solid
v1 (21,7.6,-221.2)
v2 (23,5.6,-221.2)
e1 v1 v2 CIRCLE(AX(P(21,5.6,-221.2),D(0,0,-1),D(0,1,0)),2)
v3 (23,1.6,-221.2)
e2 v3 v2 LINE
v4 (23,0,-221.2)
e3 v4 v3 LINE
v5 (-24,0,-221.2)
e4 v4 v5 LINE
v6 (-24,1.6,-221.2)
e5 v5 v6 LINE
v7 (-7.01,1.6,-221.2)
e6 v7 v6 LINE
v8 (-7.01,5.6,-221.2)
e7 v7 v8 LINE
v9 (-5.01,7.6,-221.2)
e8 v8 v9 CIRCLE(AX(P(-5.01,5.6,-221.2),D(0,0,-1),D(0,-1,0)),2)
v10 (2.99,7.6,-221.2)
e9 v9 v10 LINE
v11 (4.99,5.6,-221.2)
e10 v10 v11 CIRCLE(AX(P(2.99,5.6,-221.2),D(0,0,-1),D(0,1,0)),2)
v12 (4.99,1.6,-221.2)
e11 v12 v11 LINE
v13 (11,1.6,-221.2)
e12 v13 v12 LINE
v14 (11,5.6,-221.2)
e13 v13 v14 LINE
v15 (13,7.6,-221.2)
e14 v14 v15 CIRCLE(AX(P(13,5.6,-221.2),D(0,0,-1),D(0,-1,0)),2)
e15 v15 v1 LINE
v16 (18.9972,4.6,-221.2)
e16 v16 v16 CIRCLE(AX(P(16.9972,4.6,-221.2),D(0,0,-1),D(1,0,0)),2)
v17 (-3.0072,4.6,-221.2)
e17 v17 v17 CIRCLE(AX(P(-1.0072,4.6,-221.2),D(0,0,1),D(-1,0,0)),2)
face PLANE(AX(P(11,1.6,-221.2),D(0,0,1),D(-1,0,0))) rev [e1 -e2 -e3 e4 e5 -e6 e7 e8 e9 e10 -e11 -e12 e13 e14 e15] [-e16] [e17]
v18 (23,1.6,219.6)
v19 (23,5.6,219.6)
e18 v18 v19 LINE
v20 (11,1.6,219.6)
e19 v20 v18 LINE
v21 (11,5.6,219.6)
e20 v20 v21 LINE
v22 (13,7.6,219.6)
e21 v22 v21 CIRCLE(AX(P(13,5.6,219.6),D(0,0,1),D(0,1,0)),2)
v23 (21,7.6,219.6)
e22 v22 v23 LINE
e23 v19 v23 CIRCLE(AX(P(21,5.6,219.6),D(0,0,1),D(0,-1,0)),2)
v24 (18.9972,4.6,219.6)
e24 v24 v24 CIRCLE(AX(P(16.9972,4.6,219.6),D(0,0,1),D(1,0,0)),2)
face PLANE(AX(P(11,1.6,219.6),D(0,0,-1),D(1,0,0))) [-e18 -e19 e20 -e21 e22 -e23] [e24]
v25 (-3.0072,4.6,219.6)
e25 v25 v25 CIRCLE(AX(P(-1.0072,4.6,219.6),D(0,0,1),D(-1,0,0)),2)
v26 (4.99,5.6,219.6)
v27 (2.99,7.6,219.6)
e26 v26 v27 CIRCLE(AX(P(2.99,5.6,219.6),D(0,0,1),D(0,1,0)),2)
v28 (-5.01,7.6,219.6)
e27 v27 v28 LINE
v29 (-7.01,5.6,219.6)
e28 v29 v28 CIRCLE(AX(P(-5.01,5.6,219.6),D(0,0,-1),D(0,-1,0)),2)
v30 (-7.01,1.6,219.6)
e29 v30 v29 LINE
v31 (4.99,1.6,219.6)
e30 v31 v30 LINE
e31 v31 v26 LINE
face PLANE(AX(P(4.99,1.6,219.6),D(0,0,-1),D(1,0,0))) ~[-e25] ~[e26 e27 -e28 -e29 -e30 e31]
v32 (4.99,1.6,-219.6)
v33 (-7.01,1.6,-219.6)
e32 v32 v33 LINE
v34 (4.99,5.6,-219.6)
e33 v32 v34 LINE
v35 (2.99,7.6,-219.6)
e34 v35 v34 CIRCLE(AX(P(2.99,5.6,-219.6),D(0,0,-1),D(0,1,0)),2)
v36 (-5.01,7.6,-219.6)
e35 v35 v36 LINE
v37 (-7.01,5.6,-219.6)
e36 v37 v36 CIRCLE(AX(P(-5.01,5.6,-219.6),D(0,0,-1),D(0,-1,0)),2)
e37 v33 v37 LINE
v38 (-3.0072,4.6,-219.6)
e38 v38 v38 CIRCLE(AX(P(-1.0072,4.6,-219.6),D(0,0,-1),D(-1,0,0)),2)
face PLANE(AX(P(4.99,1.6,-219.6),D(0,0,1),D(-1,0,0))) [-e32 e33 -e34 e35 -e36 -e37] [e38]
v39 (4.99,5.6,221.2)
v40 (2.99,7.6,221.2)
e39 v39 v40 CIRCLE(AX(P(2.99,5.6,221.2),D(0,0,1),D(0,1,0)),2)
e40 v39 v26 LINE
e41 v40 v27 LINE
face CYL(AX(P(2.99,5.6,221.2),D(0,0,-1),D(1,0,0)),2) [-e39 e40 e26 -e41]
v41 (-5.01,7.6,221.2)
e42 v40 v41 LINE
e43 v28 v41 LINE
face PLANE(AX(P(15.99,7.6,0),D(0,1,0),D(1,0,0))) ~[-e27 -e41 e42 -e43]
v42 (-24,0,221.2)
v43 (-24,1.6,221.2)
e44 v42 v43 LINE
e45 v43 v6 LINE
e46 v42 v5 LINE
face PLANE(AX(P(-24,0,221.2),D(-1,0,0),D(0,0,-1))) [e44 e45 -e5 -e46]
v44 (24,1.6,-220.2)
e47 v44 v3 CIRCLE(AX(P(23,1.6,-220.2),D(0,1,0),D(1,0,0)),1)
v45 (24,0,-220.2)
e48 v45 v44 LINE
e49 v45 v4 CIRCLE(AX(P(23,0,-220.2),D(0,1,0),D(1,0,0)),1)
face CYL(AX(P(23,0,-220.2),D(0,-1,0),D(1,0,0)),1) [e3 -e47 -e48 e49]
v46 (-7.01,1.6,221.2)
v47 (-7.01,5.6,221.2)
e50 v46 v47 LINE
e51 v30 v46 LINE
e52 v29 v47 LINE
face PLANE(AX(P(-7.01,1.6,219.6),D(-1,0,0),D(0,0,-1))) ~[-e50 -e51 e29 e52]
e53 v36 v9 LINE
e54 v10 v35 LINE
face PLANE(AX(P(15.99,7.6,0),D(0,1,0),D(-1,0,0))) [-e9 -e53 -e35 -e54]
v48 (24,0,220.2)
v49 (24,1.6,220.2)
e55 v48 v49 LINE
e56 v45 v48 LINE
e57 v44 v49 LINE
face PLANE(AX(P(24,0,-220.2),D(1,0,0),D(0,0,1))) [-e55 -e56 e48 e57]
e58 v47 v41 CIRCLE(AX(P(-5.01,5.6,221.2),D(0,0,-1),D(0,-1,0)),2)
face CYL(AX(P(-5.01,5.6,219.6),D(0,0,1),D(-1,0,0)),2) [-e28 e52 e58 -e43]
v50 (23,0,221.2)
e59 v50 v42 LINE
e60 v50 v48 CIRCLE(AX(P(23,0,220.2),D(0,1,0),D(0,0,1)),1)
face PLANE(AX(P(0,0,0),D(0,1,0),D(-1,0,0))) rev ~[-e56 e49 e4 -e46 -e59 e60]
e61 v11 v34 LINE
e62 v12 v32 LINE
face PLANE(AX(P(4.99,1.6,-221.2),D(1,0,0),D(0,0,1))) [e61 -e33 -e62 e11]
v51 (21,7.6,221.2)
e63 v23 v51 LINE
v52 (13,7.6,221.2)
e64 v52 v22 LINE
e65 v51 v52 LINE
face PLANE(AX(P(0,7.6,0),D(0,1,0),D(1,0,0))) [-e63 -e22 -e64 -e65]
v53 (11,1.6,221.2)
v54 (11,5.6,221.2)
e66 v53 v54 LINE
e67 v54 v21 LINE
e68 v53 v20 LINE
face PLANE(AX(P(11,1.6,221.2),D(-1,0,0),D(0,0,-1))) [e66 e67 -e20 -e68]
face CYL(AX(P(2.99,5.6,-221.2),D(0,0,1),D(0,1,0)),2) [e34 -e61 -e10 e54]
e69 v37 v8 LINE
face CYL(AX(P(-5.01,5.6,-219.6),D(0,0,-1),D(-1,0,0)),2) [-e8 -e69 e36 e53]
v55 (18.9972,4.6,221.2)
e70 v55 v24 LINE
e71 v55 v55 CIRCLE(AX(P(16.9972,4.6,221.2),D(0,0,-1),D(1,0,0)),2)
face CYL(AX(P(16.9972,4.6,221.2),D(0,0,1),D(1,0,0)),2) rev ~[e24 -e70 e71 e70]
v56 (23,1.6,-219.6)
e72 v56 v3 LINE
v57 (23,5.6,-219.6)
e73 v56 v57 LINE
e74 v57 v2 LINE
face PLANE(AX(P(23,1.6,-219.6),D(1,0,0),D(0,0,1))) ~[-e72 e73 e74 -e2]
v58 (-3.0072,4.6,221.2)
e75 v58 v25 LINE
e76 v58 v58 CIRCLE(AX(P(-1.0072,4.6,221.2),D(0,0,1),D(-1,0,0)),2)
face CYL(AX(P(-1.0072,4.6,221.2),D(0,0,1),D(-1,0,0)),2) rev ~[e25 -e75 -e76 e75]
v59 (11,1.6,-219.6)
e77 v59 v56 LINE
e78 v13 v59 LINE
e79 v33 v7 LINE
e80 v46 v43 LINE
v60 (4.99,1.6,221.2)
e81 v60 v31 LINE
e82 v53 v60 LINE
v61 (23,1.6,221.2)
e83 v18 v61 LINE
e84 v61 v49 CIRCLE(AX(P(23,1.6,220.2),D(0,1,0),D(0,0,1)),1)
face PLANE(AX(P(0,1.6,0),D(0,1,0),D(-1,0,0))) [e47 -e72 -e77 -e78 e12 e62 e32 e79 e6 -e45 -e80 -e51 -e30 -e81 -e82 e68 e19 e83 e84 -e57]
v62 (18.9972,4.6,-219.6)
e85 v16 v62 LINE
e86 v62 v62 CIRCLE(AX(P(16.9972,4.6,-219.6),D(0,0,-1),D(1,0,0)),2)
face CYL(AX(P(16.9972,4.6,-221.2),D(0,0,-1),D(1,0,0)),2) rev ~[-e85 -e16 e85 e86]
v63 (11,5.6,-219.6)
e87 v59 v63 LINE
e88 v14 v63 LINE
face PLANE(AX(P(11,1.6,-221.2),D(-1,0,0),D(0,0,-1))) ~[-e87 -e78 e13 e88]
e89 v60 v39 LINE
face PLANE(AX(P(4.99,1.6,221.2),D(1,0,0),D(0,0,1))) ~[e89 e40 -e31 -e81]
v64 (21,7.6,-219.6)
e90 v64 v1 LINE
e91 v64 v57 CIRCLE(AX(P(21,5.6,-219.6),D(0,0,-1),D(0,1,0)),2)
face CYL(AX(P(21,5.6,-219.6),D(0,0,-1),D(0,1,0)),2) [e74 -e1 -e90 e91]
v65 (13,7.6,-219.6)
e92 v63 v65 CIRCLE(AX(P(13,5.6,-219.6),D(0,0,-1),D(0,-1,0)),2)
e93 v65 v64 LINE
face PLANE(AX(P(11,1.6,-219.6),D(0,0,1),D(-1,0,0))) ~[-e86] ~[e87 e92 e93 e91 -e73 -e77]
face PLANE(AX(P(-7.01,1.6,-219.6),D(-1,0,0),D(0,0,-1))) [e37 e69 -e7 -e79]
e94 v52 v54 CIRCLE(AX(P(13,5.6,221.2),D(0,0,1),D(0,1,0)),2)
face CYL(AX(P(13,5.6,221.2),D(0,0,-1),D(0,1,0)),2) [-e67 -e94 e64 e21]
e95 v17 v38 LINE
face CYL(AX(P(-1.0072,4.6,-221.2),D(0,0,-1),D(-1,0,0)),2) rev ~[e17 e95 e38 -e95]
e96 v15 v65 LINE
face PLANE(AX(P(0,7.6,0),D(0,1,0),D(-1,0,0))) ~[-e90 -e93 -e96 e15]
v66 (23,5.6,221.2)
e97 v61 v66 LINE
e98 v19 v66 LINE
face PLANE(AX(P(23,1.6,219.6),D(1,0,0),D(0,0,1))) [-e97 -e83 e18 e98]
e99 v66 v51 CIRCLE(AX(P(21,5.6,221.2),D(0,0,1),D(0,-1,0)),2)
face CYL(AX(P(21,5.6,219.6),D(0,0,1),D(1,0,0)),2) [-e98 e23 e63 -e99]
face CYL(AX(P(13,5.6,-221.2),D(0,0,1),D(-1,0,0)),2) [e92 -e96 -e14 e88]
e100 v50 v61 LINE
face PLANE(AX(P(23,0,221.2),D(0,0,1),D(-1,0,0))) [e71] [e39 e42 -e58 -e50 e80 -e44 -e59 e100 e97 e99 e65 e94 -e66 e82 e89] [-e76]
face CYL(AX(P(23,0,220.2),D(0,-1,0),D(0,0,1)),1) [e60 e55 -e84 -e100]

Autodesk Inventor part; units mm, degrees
ref_plane "XZ Plane" through (0, 0, 0) normal (0, 1, 0) x (-1, 0, 0)
ref_plane "XY Plane" through (0, 0, 0) normal (0, 0, 1) x (1, 0, 0)
sketch "Sketch1" plane through (0, 0, 0) normal (0, 1, 0) x (-1, 0, 0)
  line L0 (24, 221.2) -> (24, -221.2)
  line L1 (-24, -220.2) -> (-24, 220.2)
  arc A0 (-23, 221.2) -> (-24, 220.2) centre (-23, 220.2) ccw
  arc A1 (-24, -220.2) -> (-23, -221.2) centre (-23, -220.2) ccw
  line L2 (0, 0) -> (-12.5, 0)
  line L3 (-23, 221.2) -> (24, 221.2)
  line L4 (-23, -221.2) -> (24, -221.2)
  point P0 (-24, -221.2)
  dimension "d0" = 442.4
  dimension "d1" = 48
  dimension "d2" = 1
  dimension "d3" = 1
  dimension "d58" = 221.2
extrude "Extrusion1" add sketch "Sketch1" along normal blind 1.6
ref_plane "Work Plane1" through (7.995, 0, 0) normal (1, 0, 0) x (0, 1, 0)
sketch "Sketch4" plane through (0, 1.6, 0) normal (0, 1, 0) x (1, 0, 0)
  line L0 (-24, -221.2) -> (23, -221.2) projected
  line L1 (23, -221.2) -> (15, -221.2)
  line L2 (11, -219.6) -> (23, -219.6)
  line L3 (23, -219.6) -> (23, -221.2)
  line L4 (23, -221.2) -> (11, -221.2)
  line L5 (11, -221.2) -> (11, -219.6)
  line L6 (23, -221.2) -> (22, -221.2)
  line L7 (24, -220.2) -> (24, 220.2) projected
  point P0 (0, 0)
  dimension "d46" = 8
  dimension "d48" = 12
  dimension "d57" = 1
extrude "Extrusion4" add sketch "Sketch4" along normal blind 6
sketch "Sketch5" plane through (-24, 0, 221.2) normal (0, 0, 1) x (1, 0, 0)
  line L0 (35, 1.6) -> (47, 1.6) projected
  line L1 (47, 1.6) -> (47, 7.6) projected
  line L2 (47, 7.6) -> (35, 7.6) projected
  line L3 (0, 1.6) -> (35, 1.6) projected
  circle A0 centre (40.9972, 4.6) radius 2
  line L4 (35, 1.6) -> (47, 7.6)
  line L5 (35, 7.6) -> (47, 1.6)
  point P0 (24, 0)
  dimension "d52" = 4
extrude "Extrusion5" cut sketch "Sketch5" against normal blind 6 contours L4 L5 A0 | A0 L5 L4 | L5 L4 A0 | A0 L4 L5
fillet "Fillet3" radius 2 2 edges at (23, 7.6, 220.4) (11, 7.6, 220.4)
mirror "Mirror5" about plane through (7.995, 0, 0) normal (1, 0, 0) of "Extrusion4", "Extrusion5", "Fillet3"
mirror "Mirror6" about plane through (0, 0, 0) normal (0, 0, 1) of "Extrusion4", "Extrusion5", "Fillet3", "Mirror5"
properties part number "Caja - Pared"
